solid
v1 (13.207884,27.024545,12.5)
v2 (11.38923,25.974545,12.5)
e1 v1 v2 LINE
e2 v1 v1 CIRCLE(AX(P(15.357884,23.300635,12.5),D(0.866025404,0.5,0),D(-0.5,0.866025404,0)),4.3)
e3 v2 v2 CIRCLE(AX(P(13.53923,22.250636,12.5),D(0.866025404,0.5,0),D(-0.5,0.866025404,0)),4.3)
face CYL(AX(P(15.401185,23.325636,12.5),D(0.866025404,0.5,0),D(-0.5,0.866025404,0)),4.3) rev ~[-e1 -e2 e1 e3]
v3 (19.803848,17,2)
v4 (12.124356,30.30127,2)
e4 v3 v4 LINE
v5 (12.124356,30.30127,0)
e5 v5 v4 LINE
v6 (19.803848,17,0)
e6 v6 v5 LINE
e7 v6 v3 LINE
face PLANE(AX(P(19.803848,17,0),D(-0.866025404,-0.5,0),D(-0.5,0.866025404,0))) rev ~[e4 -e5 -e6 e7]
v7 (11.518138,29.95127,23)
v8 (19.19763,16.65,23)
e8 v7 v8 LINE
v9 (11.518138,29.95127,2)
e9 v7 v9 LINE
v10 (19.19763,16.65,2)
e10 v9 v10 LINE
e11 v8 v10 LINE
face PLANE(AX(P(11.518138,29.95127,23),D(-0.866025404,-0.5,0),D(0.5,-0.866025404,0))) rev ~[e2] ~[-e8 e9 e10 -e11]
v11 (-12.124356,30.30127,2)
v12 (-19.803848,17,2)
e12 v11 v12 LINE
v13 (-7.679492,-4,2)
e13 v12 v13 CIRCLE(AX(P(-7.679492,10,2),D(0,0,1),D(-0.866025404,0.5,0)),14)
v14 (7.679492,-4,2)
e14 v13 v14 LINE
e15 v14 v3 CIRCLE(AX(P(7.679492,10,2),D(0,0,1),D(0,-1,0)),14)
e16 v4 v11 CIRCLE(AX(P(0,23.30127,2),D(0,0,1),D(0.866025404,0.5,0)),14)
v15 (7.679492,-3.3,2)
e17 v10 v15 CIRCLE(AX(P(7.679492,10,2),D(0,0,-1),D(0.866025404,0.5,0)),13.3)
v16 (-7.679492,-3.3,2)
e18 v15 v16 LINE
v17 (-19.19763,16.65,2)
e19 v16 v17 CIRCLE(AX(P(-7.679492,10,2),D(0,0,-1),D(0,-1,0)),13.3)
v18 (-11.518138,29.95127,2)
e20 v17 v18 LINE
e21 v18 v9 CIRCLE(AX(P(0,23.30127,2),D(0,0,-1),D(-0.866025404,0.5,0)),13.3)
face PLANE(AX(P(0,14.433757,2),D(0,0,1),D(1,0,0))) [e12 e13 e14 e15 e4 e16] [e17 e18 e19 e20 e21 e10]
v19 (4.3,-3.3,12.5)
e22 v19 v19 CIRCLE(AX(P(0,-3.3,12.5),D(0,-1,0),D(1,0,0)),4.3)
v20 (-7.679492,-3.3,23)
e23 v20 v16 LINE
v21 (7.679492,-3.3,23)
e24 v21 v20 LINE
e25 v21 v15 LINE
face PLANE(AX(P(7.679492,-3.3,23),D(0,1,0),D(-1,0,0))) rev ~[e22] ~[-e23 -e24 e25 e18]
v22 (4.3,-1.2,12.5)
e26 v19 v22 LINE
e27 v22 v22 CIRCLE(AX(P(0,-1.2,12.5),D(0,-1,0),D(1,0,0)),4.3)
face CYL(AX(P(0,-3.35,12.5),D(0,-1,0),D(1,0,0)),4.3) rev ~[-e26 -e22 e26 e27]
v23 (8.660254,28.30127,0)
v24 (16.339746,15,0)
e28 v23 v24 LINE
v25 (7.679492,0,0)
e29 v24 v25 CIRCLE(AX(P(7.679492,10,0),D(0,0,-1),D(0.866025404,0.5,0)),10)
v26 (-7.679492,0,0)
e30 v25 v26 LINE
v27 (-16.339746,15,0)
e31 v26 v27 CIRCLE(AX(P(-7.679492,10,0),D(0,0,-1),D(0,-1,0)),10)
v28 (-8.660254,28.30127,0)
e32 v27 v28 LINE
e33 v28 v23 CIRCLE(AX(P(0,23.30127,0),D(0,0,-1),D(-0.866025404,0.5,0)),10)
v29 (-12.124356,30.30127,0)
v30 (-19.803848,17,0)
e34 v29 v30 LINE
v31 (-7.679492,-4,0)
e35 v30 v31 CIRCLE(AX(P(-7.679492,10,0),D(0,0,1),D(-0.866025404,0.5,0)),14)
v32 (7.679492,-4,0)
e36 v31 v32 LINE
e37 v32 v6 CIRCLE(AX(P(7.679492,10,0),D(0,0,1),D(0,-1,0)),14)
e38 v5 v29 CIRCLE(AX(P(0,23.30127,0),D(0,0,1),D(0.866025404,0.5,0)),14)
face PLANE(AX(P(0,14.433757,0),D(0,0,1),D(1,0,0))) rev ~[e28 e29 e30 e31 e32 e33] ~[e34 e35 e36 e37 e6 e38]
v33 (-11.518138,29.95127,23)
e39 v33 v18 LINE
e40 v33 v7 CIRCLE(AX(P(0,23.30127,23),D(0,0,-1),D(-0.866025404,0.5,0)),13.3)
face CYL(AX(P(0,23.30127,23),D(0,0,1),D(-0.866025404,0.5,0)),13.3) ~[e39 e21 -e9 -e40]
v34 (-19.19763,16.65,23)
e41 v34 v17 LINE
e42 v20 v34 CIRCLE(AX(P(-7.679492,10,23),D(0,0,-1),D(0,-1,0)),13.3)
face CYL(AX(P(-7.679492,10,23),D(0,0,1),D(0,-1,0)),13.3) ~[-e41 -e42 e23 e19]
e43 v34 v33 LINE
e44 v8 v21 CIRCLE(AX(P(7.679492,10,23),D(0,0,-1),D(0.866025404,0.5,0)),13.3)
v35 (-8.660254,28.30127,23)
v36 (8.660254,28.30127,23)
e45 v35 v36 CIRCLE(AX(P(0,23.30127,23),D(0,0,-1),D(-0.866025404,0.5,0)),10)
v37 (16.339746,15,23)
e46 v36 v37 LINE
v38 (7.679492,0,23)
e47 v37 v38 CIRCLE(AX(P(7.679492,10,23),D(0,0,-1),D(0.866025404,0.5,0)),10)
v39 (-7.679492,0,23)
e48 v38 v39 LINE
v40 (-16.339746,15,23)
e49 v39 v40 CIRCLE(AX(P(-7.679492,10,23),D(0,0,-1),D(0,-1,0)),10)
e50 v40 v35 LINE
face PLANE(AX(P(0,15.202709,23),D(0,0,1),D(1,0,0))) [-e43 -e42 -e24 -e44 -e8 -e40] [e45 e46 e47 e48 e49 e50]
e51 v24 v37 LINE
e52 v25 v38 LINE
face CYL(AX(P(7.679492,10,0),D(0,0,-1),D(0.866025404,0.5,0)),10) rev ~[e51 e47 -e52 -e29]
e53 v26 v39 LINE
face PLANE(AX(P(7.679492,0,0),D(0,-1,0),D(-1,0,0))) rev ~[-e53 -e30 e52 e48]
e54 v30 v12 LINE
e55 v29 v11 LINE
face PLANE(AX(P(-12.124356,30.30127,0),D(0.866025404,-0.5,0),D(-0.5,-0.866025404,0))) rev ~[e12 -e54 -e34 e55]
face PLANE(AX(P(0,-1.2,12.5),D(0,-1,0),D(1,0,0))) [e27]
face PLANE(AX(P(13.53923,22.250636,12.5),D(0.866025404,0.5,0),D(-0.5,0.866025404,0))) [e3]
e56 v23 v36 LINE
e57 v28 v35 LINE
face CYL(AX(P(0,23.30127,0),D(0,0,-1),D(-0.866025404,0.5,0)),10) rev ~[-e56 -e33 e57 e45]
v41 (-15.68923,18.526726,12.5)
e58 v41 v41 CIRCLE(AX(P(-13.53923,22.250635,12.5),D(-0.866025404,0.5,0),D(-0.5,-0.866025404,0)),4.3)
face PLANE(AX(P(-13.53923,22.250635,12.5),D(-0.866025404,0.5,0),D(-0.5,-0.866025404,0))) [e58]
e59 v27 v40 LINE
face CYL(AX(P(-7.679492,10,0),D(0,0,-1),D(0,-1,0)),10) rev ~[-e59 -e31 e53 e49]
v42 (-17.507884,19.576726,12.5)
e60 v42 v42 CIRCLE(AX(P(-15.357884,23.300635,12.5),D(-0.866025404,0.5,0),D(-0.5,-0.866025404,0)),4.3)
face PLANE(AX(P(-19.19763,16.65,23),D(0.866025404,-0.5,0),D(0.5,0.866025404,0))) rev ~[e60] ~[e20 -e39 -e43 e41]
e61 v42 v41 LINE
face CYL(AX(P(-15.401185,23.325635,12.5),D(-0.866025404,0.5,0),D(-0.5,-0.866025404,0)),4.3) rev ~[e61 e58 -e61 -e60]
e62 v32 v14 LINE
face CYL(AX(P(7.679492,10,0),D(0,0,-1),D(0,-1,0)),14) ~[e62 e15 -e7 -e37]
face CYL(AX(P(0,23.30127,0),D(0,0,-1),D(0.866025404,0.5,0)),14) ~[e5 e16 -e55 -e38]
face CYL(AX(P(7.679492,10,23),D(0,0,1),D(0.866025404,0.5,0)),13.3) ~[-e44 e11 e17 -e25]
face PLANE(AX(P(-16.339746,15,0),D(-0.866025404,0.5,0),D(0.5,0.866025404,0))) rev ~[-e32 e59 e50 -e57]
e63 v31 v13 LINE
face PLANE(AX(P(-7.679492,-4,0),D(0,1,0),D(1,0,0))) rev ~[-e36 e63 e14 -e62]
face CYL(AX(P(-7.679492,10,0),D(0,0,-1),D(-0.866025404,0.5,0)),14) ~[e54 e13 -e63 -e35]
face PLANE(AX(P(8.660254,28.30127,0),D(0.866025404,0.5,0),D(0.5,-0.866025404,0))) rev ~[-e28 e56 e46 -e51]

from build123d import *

# Parameters (mm, degrees)
F1_DEPTH        = 25
F3_START        = -0.65
F2_R            = 4.3
F3_DEPTH        = 2.15
F3_COPIES_COUNT = 3
F6_R            = 33.7024135389
F7_DEPTH        = 2
F9_DEPTH        = 21


# Not quite as in the source:
# - a pattern or mirror of a feature is missing from the dataset's text; its kind, count and spacing are read off the source's solid


with BuildPart() as f1:
    # F0 (on Top) → F1 (new body)
    with BuildSketch(Plane.XY):
        with BuildLine():
            ThreePointArc((7.6794919243, -4), (19.8038475773, 3), (19.8038475773, 17))
            Line((19.8038475773, 17), (12.124355653, 30.3012701892))
            ThreePointArc((12.124355653, 30.3012701892), (0, 37.3012701892), (-12.124355653, 30.3012701892))
            Line((-12.124355653, 30.3012701892), (-19.8038475773, 17))
            ThreePointArc((-19.8038475773, 17), (-19.8038475773, 3), (-7.6794919243, -4))
            Line((-7.6794919243, -4), (0, -4))
            Line((0, -4), (7.6794919243, -4))
        make_face()
        with BuildLine():
            Line((7.6794919243, 0), (0, 0))
            Line((0, 0), (-7.6794919243, 0))
            ThreePointArc((-7.6794919243, 0), (-16.3397459622, 5), (-16.3397459622, 15))
            Line((-16.3397459622, 15), (-8.6602540378, 28.3012701892))
            ThreePointArc((-8.6602540378, 28.3012701892), (0, 33.3012701892), (8.6602540378, 28.3012701892))
            Line((8.6602540378, 28.3012701892), (16.3397459622, 15))
            ThreePointArc((16.3397459622, 15), (16.3397459622, 5), (7.6794919243, 0))
        make_face(mode=Mode.SUBTRACT)
    extrude(amount=F1_DEPTH)

    # F2 (on face) → F3 (cut)
    with BuildSketch(Plane(origin=(-22.2141016151, 12.8253175473, 0), x_dir=(-0.5, -0.8660254038, 0), z_dir=(-0.8660254038, 0.5, 0)).offset(F3_START)):
        with Locations((-12.5, 12.5)):
            Circle(F2_R)
    f3 = extrude(amount=-F3_DEPTH, mode=Mode.SUBTRACT)

    # F3_copies: F3 ×3 about axis
    f3_copies_axis = Axis((0, 14.433757, 0), (0, 0, 1))
    for i in range(1, F3_COPIES_COUNT):
        add(f3.rotate(f3_copies_axis, i * 360 / F3_COPIES_COUNT), mode=Mode.SUBTRACT)

    # F6 (on face) → F7 (cut)
    with BuildSketch(Plane.XY.offset(25)):
        with Locations((0, 15.2027085423)):
            Circle(F6_R)
    extrude(amount=-F7_DEPTH, mode=Mode.SUBTRACT)

    # F8 (on face) → F9 (cut)
    with BuildSketch(Plane.XY.offset(23)):
        with BuildLine():
            Line((-12.124355653, 30.3012701892), (-19.8038475773, 17))
            ThreePointArc((-19.8038475773, 17), (-19.8038475773, 3), (-7.6794919243, -4))
            Line((-7.6794919243, -4), (7.6794919243, -4))
            ThreePointArc((7.6794919243, -4), (19.8038475773, 3), (19.8038475773, 17))
            Line((19.8038475773, 17), (12.124355653, 30.3012701892))
            ThreePointArc((12.124355653, 30.3012701892), (0, 37.3012701892), (-12.124355653, 30.3012701892))
        make_face()
        with BuildLine():
            ThreePointArc((-11.5181378703, 29.9512701892), (0, 36.6012701892), (11.5181378703, 29.9512701892))
            Line((11.5181378703, 29.9512701892), (19.1976297946, 16.65))
            ThreePointArc((19.1976297946, 16.65), (19.1976297946, 3.35), (7.6794919243, -3.3))
            Line((7.6794919243, -3.3), (-7.6794919243, -3.3))
            ThreePointArc((-7.6794919243, -3.3), (-19.1976297946, 3.35), (-19.1976297946, 16.65))
            Line((-19.1976297946, 16.65), (-11.5181378703, 29.9512701892))
        make_face(mode=Mode.SUBTRACT)
    extrude(amount=-F9_DEPTH, mode=Mode.SUBTRACT)


solid = f1.part
